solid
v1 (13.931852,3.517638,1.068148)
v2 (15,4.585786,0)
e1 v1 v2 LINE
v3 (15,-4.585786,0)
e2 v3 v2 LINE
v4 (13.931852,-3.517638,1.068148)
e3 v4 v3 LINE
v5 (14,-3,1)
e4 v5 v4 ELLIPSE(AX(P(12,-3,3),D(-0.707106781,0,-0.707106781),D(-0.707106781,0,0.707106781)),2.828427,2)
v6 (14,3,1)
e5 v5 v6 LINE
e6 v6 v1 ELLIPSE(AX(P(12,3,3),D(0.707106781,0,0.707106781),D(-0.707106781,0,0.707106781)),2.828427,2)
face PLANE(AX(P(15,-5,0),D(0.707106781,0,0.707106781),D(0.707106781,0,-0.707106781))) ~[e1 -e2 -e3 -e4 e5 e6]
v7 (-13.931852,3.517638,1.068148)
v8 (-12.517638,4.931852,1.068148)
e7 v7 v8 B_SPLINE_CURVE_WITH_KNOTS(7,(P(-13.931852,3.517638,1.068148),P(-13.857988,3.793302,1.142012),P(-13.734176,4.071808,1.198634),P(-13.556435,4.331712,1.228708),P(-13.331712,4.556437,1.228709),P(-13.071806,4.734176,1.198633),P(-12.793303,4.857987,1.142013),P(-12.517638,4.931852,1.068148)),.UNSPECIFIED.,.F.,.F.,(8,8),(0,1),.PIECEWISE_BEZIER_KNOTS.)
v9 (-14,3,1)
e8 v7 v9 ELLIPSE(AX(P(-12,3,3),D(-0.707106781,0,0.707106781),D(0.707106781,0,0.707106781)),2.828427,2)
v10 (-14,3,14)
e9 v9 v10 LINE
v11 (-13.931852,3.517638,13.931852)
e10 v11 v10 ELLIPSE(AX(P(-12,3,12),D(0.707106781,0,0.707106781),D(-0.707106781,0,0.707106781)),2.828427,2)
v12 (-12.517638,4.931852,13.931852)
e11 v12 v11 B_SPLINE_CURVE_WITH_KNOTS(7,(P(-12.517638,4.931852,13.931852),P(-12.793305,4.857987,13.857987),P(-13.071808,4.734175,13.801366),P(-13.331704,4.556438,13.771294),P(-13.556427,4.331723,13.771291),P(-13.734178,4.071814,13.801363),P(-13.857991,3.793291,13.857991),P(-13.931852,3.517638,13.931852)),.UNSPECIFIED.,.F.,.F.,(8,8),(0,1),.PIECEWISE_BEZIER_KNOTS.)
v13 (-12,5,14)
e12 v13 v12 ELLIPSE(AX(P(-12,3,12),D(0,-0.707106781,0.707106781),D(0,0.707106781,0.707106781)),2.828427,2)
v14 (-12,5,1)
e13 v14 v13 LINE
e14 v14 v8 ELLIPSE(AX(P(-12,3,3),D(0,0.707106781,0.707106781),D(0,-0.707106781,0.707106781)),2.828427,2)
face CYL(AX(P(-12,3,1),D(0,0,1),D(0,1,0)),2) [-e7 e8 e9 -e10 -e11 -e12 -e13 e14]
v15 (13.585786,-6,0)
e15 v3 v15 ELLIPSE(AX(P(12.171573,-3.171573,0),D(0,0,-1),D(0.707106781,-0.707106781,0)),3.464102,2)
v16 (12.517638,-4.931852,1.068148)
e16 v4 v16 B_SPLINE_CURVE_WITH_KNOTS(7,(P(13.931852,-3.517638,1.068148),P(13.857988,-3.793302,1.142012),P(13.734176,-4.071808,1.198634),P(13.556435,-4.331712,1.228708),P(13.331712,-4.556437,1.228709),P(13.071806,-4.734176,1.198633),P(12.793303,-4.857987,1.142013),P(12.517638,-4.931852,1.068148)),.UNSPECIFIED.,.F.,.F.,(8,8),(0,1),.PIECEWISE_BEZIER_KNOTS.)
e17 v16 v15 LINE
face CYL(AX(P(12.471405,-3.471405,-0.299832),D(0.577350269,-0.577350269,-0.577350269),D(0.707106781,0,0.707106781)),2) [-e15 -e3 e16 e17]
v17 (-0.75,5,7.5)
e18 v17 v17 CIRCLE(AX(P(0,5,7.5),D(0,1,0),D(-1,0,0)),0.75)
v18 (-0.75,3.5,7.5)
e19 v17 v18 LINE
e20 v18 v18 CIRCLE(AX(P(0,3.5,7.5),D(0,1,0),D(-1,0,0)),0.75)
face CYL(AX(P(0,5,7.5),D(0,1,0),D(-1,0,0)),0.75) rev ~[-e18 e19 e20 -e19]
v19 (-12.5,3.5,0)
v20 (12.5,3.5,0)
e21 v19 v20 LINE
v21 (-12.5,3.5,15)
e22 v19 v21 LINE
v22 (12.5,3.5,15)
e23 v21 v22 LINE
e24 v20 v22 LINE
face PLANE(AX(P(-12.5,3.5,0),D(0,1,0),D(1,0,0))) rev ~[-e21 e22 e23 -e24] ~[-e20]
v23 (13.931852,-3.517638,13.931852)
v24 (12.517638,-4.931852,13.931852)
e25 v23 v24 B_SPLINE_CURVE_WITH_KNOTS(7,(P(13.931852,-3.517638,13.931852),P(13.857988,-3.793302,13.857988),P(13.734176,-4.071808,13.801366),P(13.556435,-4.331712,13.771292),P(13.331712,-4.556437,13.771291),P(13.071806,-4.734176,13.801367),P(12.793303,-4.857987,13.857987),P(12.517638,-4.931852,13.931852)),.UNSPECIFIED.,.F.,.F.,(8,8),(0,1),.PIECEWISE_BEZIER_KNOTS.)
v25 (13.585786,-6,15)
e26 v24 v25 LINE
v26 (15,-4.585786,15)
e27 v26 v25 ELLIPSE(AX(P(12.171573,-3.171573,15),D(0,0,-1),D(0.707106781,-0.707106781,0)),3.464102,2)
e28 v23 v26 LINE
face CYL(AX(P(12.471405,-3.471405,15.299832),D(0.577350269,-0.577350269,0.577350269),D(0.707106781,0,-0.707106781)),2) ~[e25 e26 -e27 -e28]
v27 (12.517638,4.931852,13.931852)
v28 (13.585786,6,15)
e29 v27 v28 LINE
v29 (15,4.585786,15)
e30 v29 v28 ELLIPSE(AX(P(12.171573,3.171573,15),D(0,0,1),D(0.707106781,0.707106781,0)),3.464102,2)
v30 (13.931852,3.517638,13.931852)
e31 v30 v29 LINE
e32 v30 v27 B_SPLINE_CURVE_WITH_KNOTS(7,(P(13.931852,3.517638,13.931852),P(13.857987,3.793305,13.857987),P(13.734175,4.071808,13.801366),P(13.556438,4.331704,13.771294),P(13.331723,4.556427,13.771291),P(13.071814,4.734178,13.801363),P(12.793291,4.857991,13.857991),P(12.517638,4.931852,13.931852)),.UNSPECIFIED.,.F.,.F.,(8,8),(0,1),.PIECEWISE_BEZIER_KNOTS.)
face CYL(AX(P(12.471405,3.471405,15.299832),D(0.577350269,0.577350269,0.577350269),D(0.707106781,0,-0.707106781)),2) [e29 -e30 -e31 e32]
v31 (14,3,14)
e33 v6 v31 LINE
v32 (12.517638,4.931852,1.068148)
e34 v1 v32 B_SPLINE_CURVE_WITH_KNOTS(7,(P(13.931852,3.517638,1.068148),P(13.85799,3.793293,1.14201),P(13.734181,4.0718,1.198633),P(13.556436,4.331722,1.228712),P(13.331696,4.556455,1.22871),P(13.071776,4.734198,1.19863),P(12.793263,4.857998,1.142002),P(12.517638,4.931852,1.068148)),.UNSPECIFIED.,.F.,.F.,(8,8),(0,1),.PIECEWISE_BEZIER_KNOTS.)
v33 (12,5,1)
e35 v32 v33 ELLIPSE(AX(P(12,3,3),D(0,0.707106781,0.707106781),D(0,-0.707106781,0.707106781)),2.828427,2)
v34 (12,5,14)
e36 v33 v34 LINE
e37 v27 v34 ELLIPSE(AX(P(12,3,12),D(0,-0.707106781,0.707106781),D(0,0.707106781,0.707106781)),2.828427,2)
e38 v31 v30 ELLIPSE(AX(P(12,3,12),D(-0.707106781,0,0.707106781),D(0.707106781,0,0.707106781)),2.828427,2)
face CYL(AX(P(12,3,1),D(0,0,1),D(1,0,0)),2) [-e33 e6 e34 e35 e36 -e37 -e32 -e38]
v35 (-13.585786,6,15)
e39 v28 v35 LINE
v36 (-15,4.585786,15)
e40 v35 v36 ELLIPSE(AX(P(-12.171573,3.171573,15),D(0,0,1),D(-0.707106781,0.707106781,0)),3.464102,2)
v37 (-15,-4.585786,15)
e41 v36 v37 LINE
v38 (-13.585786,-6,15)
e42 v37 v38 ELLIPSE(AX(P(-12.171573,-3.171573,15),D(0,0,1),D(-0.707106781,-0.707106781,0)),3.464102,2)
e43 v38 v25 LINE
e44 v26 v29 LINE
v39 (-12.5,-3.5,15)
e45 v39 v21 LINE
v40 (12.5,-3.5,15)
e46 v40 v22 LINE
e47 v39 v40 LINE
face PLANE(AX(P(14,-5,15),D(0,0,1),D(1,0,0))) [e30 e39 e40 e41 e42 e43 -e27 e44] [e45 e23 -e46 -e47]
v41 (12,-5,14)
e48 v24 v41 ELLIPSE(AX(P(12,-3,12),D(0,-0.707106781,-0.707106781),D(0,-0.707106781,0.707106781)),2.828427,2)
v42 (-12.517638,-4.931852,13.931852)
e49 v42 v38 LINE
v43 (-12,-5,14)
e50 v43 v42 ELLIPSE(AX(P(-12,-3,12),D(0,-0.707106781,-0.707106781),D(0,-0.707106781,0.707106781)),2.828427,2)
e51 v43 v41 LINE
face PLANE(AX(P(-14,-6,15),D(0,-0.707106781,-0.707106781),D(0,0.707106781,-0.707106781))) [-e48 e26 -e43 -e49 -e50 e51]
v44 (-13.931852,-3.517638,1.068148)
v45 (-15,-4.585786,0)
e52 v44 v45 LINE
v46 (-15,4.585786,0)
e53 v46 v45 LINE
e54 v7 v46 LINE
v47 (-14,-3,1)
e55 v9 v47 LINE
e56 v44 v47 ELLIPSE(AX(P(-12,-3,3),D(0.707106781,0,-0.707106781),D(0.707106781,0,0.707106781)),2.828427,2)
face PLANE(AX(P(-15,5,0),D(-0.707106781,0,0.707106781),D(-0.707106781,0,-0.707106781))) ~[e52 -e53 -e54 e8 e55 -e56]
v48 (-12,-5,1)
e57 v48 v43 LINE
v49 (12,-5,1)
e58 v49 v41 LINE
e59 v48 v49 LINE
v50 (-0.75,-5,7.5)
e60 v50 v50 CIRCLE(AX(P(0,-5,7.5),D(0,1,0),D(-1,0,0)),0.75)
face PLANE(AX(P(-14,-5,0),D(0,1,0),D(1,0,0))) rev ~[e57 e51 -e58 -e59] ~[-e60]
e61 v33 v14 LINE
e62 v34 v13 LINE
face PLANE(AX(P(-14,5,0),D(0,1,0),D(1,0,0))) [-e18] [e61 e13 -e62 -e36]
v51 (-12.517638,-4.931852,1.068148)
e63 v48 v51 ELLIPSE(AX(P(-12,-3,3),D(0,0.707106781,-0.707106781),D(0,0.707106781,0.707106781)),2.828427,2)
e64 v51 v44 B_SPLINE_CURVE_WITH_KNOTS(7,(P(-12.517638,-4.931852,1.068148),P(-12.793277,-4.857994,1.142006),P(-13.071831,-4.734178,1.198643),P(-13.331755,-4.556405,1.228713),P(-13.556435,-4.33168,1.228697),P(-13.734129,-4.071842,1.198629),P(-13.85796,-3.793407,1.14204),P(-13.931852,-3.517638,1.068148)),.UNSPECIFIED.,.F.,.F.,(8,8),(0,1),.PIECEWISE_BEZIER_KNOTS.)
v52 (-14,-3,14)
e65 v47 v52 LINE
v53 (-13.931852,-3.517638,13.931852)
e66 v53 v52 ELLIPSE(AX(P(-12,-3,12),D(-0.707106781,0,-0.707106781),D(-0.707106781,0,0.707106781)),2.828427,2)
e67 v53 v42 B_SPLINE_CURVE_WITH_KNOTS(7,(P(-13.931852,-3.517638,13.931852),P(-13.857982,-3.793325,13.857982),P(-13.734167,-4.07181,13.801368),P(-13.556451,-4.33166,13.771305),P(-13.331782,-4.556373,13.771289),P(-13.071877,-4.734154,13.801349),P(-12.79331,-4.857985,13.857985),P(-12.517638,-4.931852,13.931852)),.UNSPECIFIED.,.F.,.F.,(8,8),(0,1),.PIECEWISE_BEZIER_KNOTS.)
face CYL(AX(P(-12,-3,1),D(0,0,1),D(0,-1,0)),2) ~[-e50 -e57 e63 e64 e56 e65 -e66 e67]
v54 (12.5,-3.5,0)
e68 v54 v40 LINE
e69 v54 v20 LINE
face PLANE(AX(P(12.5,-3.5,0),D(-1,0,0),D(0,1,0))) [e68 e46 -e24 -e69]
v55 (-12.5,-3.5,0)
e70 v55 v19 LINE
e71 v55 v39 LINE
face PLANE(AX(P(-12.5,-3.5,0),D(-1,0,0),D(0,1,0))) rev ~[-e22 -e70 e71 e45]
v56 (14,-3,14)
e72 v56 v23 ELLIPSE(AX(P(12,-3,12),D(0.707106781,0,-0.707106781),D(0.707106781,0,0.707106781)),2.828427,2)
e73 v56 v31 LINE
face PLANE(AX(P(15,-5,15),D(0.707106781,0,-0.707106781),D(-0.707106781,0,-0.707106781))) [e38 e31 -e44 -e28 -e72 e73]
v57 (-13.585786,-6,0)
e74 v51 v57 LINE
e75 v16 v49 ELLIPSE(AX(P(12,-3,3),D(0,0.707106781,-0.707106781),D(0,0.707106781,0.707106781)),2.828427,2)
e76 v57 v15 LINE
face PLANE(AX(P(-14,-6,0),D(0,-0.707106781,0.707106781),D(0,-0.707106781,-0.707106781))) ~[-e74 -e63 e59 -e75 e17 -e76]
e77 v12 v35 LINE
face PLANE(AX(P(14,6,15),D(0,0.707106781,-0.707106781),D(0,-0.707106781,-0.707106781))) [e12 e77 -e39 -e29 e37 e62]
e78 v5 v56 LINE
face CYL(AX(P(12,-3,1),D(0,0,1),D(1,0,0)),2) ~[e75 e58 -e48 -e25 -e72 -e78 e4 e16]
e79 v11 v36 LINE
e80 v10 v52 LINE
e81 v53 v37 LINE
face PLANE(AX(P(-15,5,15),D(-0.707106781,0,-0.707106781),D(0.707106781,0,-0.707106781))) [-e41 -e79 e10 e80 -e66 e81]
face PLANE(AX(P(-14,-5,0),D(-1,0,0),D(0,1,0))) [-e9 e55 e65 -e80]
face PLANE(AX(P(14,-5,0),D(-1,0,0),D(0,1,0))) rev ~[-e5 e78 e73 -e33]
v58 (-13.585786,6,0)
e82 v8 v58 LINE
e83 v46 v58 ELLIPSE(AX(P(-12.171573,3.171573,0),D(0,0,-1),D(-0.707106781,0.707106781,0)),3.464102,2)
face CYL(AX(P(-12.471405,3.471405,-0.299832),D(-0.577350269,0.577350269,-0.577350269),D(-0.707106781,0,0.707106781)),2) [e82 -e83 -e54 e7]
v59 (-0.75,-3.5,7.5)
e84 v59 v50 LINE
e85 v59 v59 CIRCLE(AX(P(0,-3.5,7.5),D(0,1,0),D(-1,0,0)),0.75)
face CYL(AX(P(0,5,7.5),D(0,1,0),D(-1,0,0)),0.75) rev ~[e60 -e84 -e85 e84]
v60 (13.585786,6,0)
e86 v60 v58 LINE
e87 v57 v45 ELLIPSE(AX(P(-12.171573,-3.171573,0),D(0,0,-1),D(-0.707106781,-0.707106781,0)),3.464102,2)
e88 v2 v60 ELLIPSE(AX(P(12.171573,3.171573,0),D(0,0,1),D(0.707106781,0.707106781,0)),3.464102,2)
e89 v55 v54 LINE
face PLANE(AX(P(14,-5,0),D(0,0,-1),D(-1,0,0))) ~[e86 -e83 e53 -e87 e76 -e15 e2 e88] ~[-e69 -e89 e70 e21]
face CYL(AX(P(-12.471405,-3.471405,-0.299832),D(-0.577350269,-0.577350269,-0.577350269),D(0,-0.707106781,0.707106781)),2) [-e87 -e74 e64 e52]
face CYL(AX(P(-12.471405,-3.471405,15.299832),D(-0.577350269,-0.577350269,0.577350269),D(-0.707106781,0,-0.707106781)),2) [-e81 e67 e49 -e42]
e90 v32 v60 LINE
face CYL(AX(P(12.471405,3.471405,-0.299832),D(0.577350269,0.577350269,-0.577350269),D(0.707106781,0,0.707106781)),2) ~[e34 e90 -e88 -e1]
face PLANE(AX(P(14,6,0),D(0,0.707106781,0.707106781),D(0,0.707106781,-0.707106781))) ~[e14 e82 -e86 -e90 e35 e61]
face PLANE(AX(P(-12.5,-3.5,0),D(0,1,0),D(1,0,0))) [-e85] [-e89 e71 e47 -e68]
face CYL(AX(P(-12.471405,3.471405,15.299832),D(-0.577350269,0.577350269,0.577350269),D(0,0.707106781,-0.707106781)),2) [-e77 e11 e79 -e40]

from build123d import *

# Parameters (mm, degrees)
F0_W     = 28
F0_H     = 10
F0_W_2   = 25
F0_H_2   = 7
F1_DEPTH = 15
F2_R     = 0.75
F3_DEPTH = 10.001
F6_F1_R  = 2
F6_F2_R  = 2
F6_F3_R  = 2
F6_F4_R  = 2
F6_F5_R  = 2
F6_F6_R  = 2
F6_F7_R  = 2
F6_F8_R  = 2
F6_F9_R  = 2
F6_F10_R = 2
F6_F11_R = 2
F6_F12_R = 2


# Not quite as in the source:
# - a feature of the source that left no trace in its solid (it failed there, or was rolled back) is left out
# - a pattern or mirror of a feature is missing from the dataset's text; its kind, count and spacing are read off the source's solid


with BuildPart() as f1:
    # F0 (on Top) → F1 (new body)
    with BuildSketch(Plane.XY):
        Rectangle(F0_W, F0_H)
        Rectangle(F0_W_2, F0_H_2, mode=Mode.SUBTRACT)
    extrude(amount=F1_DEPTH)

    # F2 (on face) → F3 (cut, through all)
    with BuildSketch(Plane(origin=(0, 5, 0), x_dir=(-1, 0, 0), z_dir=(0, 1, 0))):
        with Locations((0, 7.5)):
            Circle(F2_R)
    extrude(amount=-F3_DEPTH, mode=Mode.SUBTRACT)

    # F4: sweep along a path in F4_path
    with BuildLine(Plane(origin=(14, -5, 15), x_dir=(0, -1, 0), z_dir=(0, 0, -1))) as f4_path:
        Line((0, 0), (-10, 0))
        Line((-10, 0), (-10, 28))
        Line((-10, 28), (0, 28))
        Line((0, 28), (0, 0))
    # F2 (on face) → F4 (sweep)
    with BuildSketch(Plane(origin=(0, 5, 0), x_dir=(-1, 0, 0), z_dir=(0, 1, 0))):
        Polygon((-14, 14), (-14, 15), (-15, 15), align=None)
    f4 = sweep(path=f4_path.line, transition=Transition.RIGHT)

    # F4_copies: F4 across plane
    add(f4.mirror(Plane(origin=(0, 0, 7.5), x_dir=(-1, 0, 0), z_dir=(0, 0, -1))))

    # F6: fillet of radius 2 on 12 edges, made by hand

    # F6_f1
    f6_f1_edges = [f1.edges().sort_by_distance(p)[0] for p in [
        (14, 5, 7.5),
    ]]
    fillet(f6_f1_edges, radius=F6_F1_R)

    # F6_f2
    f6_f2_edges = [f1.edges().sort_by_distance(p)[0] for p in [
        (14, -5, 7.5),
    ]]
    fillet(f6_f2_edges, radius=F6_F2_R)

    # F6_f3
    f6_f3_edges = [f1.edges().sort_by_distance(p)[0] for p in [
        (14.2071067812, -5.2071067812, 0.7928932188),
    ]]
    fillet(f6_f3_edges, radius=F6_F3_R)

    # F6_f4
    f6_f4_edges = [f1.edges().sort_by_distance(p)[0] for p in [
        (14.2071067812, 5.2071067812, 0.7928932188),
    ]]
    fillet(f6_f4_edges, radius=F6_F4_R)

    # F6_f5
    f6_f5_edges = [f1.edges().sort_by_distance(p)[0] for p in [
        (-14, 5, 7.5),
    ]]
    fillet(f6_f5_edges, radius=F6_F5_R)

    # F6_f6
    f6_f6_edges = [f1.edges().sort_by_distance(p)[0] for p in [
        (14.2071067812, -5.2071067812, 14.2071067812),
    ]]
    fillet(f6_f6_edges, radius=F6_F6_R)

    # F6_f7
    f6_f7_edges = [f1.edges().sort_by_distance(p)[0] for p in [
        (14.2071067812, 5.2071067812, 14.2071067812),
    ]]
    fillet(f6_f7_edges, radius=F6_F7_R)

    # F6_f8
    f6_f8_edges = [f1.edges().sort_by_distance(p)[0] for p in [
        (-14, -5, 7.5),
    ]]
    fillet(f6_f8_edges, radius=F6_F8_R)

    # F6_f9
    f6_f9_edges = [f1.edges().sort_by_distance(p)[0] for p in [
        (-14.2071067812, -5.2071067812, 0.7928932188),
    ]]
    fillet(f6_f9_edges, radius=F6_F9_R)

    # F6_f10
    f6_f10_edges = [f1.edges().sort_by_distance(p)[0] for p in [
        (-14.2071067812, 5.2071067812, 0.7928932188),
    ]]
    fillet(f6_f10_edges, radius=F6_F10_R)

    # F6_f11
    f6_f11_edges = [f1.edges().sort_by_distance(p)[0] for p in [
        (-14.2071067812, 5.2071067812, 14.2071067812),
    ]]
    fillet(f6_f11_edges, radius=F6_F11_R)

    # F6_f12
    f6_f12_edges = [f1.edges().sort_by_distance(p)[0] for p in [
        (-14.2071067812, -5.2071067812, 14.2071067812),
    ]]
    fillet(f6_f12_edges, radius=F6_F12_R)


solid = f1.part
